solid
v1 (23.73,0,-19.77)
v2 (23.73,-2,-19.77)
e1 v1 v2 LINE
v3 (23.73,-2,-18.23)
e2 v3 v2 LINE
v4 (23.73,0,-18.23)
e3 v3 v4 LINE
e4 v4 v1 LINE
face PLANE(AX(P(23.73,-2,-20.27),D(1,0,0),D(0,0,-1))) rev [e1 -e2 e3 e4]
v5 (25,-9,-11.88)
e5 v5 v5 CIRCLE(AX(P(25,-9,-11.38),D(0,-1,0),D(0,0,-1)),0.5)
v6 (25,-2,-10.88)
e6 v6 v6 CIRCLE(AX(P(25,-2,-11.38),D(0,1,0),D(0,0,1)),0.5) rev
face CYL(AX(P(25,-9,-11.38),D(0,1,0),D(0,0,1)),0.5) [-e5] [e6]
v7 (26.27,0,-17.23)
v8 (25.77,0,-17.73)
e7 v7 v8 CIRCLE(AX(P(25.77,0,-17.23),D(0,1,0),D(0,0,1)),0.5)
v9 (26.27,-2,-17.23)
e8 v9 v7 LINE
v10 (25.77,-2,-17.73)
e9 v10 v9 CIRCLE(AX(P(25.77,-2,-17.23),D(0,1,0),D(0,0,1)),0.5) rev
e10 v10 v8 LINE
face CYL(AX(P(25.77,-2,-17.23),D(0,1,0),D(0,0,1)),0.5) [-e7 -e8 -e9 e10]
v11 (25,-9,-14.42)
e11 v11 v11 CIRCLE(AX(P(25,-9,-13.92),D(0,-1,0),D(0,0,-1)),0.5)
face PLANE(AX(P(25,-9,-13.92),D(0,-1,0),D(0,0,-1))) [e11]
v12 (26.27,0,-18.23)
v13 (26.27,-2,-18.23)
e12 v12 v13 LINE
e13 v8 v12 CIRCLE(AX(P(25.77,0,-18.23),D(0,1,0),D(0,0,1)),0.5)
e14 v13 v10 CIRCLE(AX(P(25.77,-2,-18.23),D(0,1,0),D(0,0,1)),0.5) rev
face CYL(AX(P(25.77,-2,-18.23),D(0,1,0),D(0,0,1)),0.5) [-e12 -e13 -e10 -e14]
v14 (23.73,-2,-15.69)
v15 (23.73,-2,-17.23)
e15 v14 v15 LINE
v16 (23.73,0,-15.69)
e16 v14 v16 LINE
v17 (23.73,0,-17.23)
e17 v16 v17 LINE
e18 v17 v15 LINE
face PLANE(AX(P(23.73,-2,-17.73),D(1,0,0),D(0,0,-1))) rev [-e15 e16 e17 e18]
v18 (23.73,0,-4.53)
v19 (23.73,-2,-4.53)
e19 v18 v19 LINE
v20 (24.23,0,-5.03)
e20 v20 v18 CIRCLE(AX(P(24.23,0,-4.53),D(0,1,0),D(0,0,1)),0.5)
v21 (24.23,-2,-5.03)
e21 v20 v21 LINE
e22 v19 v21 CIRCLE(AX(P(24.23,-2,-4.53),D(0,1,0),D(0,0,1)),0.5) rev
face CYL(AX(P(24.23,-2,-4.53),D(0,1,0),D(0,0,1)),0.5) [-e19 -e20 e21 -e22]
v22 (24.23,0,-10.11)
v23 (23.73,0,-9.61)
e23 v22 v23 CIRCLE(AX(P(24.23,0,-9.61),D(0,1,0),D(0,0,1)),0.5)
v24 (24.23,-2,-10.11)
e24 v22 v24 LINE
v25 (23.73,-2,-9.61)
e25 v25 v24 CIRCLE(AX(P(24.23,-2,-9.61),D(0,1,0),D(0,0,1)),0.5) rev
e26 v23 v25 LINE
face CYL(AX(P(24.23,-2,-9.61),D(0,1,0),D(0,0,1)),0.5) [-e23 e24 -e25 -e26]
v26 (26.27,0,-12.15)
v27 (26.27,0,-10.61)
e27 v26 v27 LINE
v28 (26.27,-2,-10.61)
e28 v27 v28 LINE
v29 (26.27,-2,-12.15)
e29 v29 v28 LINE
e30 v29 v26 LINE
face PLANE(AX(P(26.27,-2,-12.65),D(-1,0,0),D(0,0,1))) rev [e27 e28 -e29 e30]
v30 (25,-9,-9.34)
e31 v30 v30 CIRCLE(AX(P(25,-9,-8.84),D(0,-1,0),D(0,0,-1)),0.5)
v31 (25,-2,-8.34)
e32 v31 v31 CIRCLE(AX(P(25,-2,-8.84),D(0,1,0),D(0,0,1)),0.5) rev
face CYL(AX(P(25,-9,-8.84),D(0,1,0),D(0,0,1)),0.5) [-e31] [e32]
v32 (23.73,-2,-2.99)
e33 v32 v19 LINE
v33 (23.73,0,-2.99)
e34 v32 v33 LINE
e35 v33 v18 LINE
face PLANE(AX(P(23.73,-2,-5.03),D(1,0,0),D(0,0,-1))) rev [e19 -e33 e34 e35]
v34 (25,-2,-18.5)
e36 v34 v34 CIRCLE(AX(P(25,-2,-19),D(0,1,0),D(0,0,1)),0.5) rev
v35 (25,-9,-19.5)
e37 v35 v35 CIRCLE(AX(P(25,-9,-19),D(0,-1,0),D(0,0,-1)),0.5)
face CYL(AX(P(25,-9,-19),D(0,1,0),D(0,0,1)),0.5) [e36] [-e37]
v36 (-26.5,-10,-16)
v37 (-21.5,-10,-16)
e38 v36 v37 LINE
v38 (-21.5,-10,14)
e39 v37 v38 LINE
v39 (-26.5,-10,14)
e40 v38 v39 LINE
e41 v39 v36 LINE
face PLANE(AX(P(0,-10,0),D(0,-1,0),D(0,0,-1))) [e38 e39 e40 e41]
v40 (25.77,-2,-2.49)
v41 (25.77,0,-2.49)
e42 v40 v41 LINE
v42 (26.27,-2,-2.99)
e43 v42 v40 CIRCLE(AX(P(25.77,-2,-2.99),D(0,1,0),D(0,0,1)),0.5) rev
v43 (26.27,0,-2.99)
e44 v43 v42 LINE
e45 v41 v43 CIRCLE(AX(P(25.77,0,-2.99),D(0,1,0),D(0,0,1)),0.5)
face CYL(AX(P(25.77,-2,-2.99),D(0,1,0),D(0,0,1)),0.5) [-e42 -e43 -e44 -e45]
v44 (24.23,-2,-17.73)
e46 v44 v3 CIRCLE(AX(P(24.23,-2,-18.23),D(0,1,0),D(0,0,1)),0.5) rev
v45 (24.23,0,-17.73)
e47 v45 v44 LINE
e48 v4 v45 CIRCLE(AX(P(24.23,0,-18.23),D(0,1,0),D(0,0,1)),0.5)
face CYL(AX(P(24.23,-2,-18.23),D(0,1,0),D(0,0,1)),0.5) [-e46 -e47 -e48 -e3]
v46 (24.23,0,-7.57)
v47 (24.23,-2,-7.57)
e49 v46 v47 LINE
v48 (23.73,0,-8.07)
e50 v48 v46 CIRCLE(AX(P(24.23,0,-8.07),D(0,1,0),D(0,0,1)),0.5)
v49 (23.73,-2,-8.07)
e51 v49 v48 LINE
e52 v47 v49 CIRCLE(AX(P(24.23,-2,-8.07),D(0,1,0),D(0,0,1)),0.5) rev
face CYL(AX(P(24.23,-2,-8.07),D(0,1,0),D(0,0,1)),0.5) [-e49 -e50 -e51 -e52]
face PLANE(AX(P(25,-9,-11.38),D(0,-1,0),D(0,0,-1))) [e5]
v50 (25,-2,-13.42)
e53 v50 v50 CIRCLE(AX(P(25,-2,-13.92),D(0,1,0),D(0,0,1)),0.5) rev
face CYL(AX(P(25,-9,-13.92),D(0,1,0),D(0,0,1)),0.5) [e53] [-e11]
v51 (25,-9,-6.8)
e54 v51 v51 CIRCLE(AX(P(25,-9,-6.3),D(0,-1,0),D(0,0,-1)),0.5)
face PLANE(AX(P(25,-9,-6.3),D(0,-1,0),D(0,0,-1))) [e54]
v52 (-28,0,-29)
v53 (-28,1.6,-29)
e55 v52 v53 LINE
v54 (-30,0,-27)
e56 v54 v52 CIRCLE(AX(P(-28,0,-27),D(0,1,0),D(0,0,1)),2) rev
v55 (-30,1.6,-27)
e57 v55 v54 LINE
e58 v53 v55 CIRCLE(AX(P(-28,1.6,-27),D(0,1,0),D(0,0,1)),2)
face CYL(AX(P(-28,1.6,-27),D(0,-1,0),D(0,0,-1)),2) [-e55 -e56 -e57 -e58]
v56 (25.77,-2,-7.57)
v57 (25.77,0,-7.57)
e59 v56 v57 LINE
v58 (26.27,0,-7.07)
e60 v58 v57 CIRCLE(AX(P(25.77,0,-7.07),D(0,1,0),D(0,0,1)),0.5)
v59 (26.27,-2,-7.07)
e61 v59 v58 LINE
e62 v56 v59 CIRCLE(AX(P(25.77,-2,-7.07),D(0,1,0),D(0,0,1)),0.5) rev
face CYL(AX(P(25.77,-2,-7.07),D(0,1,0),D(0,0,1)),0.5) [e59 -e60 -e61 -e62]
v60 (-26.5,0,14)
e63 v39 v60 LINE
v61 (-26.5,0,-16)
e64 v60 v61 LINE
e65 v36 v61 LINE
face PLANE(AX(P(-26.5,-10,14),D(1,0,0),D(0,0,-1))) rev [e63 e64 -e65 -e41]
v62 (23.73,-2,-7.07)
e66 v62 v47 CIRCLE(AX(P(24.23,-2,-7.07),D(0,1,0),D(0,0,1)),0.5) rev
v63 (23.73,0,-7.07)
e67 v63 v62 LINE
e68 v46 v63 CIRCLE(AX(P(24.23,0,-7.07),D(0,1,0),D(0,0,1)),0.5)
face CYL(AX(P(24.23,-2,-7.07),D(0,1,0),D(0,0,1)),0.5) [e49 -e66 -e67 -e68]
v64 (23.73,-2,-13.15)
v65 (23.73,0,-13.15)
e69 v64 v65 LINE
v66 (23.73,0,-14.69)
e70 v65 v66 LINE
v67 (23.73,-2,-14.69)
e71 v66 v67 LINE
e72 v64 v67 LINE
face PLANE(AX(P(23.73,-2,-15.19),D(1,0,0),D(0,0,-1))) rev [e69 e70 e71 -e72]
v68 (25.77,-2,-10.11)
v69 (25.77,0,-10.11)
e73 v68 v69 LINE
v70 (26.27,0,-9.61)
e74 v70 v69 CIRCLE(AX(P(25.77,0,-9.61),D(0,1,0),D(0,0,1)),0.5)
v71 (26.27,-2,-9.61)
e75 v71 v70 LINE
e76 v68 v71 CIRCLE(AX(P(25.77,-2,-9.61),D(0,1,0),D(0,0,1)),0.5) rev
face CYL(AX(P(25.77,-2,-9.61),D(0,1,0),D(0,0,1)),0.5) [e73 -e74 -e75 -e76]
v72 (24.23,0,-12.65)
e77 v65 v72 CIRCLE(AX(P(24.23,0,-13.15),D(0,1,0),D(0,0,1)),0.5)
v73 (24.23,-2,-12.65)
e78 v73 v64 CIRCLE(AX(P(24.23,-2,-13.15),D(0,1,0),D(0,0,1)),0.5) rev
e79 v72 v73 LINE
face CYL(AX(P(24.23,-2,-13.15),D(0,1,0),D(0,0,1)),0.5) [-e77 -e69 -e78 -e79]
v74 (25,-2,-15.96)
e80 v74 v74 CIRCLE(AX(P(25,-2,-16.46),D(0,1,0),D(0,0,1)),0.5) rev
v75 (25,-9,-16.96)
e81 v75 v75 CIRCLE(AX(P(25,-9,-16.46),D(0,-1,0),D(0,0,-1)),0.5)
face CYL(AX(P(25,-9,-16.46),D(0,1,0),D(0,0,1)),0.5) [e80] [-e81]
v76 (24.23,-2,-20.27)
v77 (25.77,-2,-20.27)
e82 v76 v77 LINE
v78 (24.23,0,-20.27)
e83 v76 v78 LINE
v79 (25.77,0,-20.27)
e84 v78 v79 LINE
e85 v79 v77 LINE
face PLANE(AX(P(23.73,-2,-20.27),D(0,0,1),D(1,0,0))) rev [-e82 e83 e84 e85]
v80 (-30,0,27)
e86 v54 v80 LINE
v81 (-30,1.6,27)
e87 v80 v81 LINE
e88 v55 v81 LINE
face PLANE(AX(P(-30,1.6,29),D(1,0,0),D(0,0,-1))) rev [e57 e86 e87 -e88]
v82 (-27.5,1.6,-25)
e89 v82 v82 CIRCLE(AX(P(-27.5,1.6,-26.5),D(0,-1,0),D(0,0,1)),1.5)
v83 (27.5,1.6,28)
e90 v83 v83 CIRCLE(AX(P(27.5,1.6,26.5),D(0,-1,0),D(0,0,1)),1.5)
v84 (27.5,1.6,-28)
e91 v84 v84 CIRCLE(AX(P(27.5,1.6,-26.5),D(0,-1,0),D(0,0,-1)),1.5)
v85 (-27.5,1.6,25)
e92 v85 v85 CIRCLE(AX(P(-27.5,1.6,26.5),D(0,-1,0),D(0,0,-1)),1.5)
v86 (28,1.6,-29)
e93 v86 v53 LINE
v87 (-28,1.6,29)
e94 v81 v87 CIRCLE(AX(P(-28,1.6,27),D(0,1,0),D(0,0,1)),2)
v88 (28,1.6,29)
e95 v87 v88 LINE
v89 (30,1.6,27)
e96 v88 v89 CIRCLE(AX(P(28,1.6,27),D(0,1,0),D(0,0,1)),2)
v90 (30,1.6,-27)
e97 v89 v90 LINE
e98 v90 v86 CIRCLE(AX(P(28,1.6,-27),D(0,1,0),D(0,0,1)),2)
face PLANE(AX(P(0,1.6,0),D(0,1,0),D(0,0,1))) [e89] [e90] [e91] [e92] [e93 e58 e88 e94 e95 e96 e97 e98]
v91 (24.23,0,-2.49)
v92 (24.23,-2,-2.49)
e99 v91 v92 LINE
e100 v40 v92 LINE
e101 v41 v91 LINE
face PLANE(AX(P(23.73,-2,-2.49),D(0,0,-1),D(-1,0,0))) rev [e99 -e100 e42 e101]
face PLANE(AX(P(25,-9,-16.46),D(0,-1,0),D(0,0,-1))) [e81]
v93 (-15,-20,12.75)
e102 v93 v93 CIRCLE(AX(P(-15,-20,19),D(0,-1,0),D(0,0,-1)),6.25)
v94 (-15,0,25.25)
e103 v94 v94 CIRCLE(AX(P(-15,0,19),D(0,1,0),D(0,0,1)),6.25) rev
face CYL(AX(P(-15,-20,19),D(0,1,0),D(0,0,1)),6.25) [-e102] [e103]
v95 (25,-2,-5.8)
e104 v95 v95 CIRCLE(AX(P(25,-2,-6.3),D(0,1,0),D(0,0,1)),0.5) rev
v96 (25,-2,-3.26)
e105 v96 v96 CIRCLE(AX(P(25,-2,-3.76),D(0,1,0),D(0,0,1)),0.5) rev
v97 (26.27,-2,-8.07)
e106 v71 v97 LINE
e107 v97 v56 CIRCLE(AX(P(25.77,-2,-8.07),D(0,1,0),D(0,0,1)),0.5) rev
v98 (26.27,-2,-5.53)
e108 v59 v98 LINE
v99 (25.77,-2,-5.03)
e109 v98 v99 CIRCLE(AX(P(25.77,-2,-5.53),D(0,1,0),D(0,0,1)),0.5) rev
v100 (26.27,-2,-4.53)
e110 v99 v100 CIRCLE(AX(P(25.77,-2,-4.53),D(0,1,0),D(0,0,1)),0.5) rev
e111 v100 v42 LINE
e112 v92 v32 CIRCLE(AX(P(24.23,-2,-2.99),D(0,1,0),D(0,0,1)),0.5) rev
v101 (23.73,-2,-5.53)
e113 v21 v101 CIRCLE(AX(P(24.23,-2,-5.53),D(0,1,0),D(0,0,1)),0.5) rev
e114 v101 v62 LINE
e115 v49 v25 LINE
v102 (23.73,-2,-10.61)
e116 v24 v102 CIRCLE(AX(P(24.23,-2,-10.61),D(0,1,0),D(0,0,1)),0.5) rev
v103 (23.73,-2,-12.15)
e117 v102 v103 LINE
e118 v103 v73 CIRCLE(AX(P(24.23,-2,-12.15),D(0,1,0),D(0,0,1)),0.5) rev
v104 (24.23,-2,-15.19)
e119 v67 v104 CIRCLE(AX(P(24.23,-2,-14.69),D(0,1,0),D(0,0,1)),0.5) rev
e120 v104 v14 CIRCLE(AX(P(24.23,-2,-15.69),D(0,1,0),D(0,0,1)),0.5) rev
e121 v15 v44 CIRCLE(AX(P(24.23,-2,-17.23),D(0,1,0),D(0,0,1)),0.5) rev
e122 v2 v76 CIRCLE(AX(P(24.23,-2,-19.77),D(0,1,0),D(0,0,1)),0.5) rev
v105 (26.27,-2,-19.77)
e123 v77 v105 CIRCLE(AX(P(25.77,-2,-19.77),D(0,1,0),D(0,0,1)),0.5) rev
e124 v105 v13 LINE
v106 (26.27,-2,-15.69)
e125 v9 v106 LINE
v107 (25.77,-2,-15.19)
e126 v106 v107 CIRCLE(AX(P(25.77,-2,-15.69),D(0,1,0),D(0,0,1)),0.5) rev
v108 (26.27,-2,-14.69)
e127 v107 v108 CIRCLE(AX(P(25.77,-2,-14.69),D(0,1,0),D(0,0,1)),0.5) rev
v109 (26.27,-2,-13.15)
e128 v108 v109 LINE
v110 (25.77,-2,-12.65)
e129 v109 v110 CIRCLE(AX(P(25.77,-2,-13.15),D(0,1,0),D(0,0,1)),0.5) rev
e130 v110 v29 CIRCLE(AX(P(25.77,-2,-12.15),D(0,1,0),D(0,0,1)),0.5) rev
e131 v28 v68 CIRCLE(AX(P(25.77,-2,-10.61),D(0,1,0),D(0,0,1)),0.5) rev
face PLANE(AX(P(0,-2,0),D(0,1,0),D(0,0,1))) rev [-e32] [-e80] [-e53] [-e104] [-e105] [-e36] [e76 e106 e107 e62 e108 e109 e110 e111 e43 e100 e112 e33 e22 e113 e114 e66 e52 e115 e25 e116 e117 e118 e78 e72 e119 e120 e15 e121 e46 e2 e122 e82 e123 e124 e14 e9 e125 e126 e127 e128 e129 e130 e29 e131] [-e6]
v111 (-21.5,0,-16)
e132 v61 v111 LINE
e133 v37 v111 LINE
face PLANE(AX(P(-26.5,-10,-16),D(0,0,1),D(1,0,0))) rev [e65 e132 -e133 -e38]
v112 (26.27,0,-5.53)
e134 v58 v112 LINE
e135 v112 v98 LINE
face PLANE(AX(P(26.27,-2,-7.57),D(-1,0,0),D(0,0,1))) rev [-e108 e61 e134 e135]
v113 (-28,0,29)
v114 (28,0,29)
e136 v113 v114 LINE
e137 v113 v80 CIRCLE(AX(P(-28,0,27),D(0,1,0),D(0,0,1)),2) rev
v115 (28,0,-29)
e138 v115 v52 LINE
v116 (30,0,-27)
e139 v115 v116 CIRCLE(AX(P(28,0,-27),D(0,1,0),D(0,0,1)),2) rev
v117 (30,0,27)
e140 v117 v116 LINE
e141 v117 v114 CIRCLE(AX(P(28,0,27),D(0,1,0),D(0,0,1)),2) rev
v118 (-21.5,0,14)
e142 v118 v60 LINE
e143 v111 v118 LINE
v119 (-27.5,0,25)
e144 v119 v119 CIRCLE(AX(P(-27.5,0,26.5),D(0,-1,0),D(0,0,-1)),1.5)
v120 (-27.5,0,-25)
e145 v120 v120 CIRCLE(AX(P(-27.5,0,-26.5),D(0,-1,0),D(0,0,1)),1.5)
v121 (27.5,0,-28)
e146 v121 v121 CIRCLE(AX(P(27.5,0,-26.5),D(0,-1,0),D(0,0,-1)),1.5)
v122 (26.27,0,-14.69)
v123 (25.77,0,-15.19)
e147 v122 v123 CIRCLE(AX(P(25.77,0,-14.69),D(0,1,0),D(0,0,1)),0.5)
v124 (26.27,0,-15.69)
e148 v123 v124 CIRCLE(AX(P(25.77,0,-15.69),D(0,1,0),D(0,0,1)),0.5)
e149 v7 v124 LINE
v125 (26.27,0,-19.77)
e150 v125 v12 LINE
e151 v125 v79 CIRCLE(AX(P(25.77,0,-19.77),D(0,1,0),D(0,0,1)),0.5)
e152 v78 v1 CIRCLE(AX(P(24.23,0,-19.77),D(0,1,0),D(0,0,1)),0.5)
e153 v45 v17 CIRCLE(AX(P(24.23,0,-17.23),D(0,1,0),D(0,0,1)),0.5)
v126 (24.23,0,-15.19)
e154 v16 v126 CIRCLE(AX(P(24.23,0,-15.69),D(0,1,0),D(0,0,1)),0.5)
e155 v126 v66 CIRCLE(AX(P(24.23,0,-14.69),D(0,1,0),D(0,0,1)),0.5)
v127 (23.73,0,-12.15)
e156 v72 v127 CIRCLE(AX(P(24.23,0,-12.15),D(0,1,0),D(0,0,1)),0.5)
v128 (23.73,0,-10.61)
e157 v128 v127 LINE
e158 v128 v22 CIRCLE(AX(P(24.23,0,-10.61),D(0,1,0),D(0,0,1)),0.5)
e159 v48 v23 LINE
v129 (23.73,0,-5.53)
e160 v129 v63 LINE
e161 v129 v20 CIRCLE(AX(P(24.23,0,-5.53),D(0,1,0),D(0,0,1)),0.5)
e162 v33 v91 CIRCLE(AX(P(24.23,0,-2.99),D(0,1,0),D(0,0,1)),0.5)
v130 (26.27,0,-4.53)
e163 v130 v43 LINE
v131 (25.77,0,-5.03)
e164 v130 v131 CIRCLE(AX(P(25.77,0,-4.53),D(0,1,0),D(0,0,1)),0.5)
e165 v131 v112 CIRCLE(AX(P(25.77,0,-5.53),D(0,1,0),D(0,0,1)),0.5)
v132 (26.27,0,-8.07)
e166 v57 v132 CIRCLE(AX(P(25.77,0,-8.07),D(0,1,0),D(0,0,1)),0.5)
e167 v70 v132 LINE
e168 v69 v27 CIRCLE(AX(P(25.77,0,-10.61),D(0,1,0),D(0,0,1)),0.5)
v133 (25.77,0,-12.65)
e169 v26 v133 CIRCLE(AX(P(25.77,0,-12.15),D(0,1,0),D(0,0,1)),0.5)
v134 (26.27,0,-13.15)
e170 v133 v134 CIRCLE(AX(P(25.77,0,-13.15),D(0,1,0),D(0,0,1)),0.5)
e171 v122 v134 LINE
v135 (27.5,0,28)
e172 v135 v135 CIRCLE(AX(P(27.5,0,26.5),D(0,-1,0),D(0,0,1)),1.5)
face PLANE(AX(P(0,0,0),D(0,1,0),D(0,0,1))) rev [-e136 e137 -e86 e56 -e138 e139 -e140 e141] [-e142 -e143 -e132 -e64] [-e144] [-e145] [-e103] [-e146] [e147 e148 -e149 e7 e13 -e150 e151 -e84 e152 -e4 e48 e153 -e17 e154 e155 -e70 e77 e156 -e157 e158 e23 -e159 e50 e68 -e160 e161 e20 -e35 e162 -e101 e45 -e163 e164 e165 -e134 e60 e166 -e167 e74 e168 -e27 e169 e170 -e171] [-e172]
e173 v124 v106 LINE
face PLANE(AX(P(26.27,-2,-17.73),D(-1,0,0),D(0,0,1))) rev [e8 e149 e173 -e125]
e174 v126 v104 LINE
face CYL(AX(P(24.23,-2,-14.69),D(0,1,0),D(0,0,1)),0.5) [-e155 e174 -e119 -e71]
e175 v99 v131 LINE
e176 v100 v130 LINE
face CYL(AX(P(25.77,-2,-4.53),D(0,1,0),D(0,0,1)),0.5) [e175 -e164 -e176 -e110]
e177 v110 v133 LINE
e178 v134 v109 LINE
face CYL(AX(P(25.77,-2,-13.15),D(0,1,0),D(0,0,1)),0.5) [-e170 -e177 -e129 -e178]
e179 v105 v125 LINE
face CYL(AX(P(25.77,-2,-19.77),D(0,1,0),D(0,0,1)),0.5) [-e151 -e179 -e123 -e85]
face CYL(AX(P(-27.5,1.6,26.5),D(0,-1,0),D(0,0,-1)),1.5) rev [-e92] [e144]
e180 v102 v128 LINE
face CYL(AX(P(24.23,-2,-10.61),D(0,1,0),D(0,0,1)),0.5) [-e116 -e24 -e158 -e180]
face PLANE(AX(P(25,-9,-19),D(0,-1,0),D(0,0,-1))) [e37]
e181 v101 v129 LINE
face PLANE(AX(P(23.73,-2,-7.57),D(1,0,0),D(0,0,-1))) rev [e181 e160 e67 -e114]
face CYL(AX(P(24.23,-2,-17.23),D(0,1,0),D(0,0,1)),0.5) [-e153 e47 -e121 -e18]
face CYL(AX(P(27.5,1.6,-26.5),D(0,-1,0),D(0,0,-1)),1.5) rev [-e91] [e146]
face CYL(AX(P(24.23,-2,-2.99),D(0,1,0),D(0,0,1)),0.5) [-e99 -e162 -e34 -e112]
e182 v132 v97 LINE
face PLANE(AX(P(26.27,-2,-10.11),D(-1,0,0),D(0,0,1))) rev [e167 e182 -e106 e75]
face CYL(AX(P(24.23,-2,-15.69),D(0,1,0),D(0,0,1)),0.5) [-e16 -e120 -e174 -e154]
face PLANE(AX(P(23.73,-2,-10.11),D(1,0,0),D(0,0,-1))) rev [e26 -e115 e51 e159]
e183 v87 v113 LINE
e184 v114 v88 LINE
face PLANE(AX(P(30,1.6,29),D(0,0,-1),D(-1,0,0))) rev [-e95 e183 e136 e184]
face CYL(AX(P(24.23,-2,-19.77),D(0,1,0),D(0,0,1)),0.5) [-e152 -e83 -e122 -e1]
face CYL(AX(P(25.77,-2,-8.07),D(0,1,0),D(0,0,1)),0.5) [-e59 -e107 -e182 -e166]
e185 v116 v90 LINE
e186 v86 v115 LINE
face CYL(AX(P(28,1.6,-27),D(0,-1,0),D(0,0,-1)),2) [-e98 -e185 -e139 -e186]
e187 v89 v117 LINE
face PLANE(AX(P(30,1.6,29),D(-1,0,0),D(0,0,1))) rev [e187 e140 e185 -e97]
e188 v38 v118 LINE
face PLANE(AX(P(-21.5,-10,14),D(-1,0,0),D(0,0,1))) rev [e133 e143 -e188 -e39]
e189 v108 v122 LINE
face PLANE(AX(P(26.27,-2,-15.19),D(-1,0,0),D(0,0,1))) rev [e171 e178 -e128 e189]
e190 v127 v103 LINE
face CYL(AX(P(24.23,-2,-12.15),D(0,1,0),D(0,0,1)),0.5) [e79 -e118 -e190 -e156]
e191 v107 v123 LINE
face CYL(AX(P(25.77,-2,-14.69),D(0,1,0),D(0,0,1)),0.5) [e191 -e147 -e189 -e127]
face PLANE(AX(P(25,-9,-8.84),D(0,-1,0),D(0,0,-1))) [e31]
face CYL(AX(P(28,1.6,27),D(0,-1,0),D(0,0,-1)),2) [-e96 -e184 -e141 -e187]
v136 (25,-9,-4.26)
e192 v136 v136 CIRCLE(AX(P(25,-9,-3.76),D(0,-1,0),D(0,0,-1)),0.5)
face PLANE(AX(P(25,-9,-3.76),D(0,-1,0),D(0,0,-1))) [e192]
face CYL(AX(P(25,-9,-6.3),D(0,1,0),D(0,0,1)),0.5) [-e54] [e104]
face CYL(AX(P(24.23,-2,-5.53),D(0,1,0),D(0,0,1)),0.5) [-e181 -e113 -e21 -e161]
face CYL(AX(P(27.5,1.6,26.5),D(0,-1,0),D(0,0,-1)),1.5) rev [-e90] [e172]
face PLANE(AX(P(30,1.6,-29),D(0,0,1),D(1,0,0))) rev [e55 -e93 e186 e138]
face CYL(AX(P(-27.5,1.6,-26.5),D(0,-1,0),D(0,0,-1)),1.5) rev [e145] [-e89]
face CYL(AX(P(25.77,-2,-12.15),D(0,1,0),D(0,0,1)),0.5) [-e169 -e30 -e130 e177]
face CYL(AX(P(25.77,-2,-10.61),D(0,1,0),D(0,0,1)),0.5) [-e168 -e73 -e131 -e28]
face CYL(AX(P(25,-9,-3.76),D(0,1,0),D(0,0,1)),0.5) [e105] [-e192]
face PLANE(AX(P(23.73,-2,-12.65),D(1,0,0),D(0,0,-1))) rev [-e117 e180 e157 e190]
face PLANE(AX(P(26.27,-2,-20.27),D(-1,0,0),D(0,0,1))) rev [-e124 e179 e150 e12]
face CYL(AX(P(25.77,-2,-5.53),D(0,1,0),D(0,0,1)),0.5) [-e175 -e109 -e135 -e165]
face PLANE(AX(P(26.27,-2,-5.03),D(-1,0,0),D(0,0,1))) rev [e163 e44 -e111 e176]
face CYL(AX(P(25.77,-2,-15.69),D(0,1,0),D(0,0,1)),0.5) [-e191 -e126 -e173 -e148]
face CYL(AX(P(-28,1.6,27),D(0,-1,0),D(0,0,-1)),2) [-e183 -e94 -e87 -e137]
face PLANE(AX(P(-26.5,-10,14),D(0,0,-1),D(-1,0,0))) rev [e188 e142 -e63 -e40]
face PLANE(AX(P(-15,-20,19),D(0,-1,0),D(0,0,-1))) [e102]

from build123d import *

# Parameters (mm, degrees)
SKETCH1_W             = 60
SKETCH1_H             = 58
BOSS_EXTRUDE1_DEPTH   = 1.6
FILLET1_R             = 2
SKETCH2_R             = 1.5
CUT_EXTRUDE1_DEPTH    = 1.6
SKETCH3_R             = 6.25
BOSS_EXTRUDE2_DEPTH   = 20
SKETCH4_W             = 5
SKETCH4_H             = 30
BOSS_EXTRUDE3_DEPTH   = 10
SKETCH5_W             = 2.54
SKETCH5_H             = 2.54
BOSS_EXTRUDE4_DEPTH   = 2
FILLET2_R             = 0.5
SKETCH6_R             = 0.5
BOSS_EXTRUDE5_DEPTH   = 7
LPATTERN1_START       = -2
LPATTERN1_DEPTH       = 2
LPATTERN1_START_2     = -9
LPATTERN1_2_OUTLINE_R = 0.5
LPATTERN1_2_DEPTH     = 7


# Read off the part's stored shape, not the designer's step: LPattern1
with BuildPart() as part:
    # Sketch1 → Boss-Extrude1 (new body)
    with BuildSketch(Plane(origin=(0, 0, 0), x_dir=(1, 0, 0), z_dir=(0, 1, 0))):
        Rectangle(SKETCH1_W, SKETCH1_H)
    extrude(amount=BOSS_EXTRUDE1_DEPTH)

    # Fillet1
    fillet1_edges = [part.edges().sort_by_distance(p)[0] for p in [
        (-30, 0.8, -29),
        (30, 0.8, -29),
        (30, 0.8, 29),
        (-30, 0.8, 29),
    ]]
    fillet(fillet1_edges, radius=FILLET1_R)

    # Sketch2 → Cut-Extrude1 (cut)
    with BuildSketch(Plane.XZ):
        with Locations(Location((-27.5, 26.5, 0), (0, 0, 270))):
            Circle(SKETCH2_R)
        with Locations(Location((-27.5, -26.5, 0), (0, 0, 90))):
            Circle(SKETCH2_R)
        with Locations(Location((27.5, -26.5, 0), (0, 0, 270))):
            Circle(SKETCH2_R)
        with Locations(Location((27.5, 26.5, 0), (0, 0, 90))):
            Circle(SKETCH2_R)
    extrude(amount=-CUT_EXTRUDE1_DEPTH, mode=Mode.SUBTRACT)

    # Sketch3 → Boss-Extrude2 (add)
    with BuildSketch(Plane.XZ):
        with Locations(Location((-15, 19, 0), (0, 0, 90))):
            Circle(SKETCH3_R)
    extrude(amount=BOSS_EXTRUDE2_DEPTH)

    # Sketch4 → Boss-Extrude3 (add)
    with BuildSketch(Plane.XZ):
        with Locations((-24, -1)):
            Rectangle(SKETCH4_W, SKETCH4_H)
    extrude(amount=BOSS_EXTRUDE3_DEPTH)

    # Sketch5 → Boss-Extrude4 (add)
    with BuildSketch(Plane.XZ):
        with Locations((25, -19)):
            Rectangle(SKETCH5_W, SKETCH5_H)
    extrude(amount=BOSS_EXTRUDE4_DEPTH)

    # Fillet2
    fillet2_edges = [part.edges().sort_by_distance(p)[0] for p in [
        (26.27, -1, -20.27),
        (26.27, -1, -17.73),
        (23.73, -1, -17.73),
        (23.73, -1, -20.27),
    ]]
    fillet(fillet2_edges, radius=FILLET2_R)

    # Sketch6 → Boss-Extrude5 (add)
    with BuildSketch(Plane.XZ.offset(2)):
        with Locations(Location((25, -19, 0), (0, 0, 90))):
            Circle(SKETCH6_R)
    extrude(amount=BOSS_EXTRUDE5_DEPTH)

    # LPattern1 outline → LPattern1 (add)
    with BuildSketch(Plane(origin=(0, 0, 0), x_dir=(1, 0, 0), z_dir=(0, 1, 0)).offset(LPATTERN1_START)):
        with BuildLine():
            Line((26.27, 15.69), (26.27, 17.23))
            ThreePointArc((26.27, 17.23), (26.123553391, 17.583553391), (25.77, 17.73))
            Line((25.77, 17.73), (24.23, 17.73))
            ThreePointArc((24.23, 17.73), (23.876446609, 17.583553391), (23.73, 17.23))
            Line((23.73, 17.23), (23.73, 15.69))
            ThreePointArc((23.73, 15.69), (23.876446609, 15.336446609), (24.23, 15.19))
            ThreePointArc((24.23, 15.19), (23.876446609, 15.043553391), (23.73, 14.69))
            Line((23.73, 14.69), (23.73, 13.15))
            ThreePointArc((23.73, 13.15), (23.876446609, 12.796446609), (24.23, 12.65))
            ThreePointArc((24.23, 12.65), (23.876446609, 12.503553391), (23.73, 12.15))
            Line((23.73, 12.15), (23.73, 10.61))
            ThreePointArc((23.73, 10.61), (23.876446609, 10.256446609), (24.23, 10.11))
            ThreePointArc((24.23, 10.11), (23.876446609, 9.963553391), (23.73, 9.61))
            Line((23.73, 9.61), (23.73, 8.07))
            ThreePointArc((23.73, 8.07), (23.876446609, 7.716446609), (24.23, 7.57))
            ThreePointArc((24.23, 7.57), (23.876446609, 7.423553391), (23.73, 7.07))
            Line((23.73, 7.07), (23.73, 5.53))
            ThreePointArc((23.73, 5.53), (23.876446609, 5.176446609), (24.23, 5.03))
            ThreePointArc((24.23, 5.03), (23.876446609, 4.883553391), (23.73, 4.53))
            Line((23.73, 4.53), (23.73, 2.99))
            ThreePointArc((23.73, 2.99), (23.876446609, 2.636446609), (24.23, 2.49))
            Line((24.23, 2.49), (25.77, 2.49))
            ThreePointArc((25.77, 2.49), (26.123553391, 2.636446609), (26.27, 2.99))
            Line((26.27, 2.99), (26.27, 4.53))
            ThreePointArc((26.27, 4.53), (26.123553391, 4.883553391), (25.77, 5.03))
            ThreePointArc((25.77, 5.03), (26.123553391, 5.176446609), (26.27, 5.53))
            Line((26.27, 5.53), (26.27, 7.07))
            ThreePointArc((26.27, 7.07), (26.123553391, 7.423553391), (25.77, 7.57))
            ThreePointArc((25.77, 7.57), (26.123553391, 7.716446609), (26.27, 8.07))
            Line((26.27, 8.07), (26.27, 9.61))
            ThreePointArc((26.27, 9.61), (26.123553391, 9.963553391), (25.77, 10.11))
            ThreePointArc((25.77, 10.11), (26.123553391, 10.256446609), (26.27, 10.61))
            Line((26.27, 10.61), (26.27, 12.15))
            ThreePointArc((26.27, 12.15), (26.123553391, 12.503553391), (25.77, 12.65))
            ThreePointArc((25.77, 12.65), (26.123553391, 12.796446609), (26.27, 13.15))
            Line((26.27, 13.15), (26.27, 14.69))
            ThreePointArc((26.27, 14.69), (26.123553391, 15.043553391), (25.77, 15.19))
            ThreePointArc((25.77, 15.19), (26.123553391, 15.336446609), (26.27, 15.69))
        make_face()
    extrude(amount=LPATTERN1_DEPTH)

    # LPattern1 2 outline → LPattern1 2 (add)
    with BuildSketch(Plane(origin=(0, 0, 0), x_dir=(1, 0, 0), z_dir=(0, 1, 0)).offset(LPATTERN1_START_2)):
        with Locations((25, 16.46)):
            Circle(LPATTERN1_2_OUTLINE_R)
        with Locations((25, 13.92)):
            Circle(LPATTERN1_2_OUTLINE_R)
        with Locations((25, 11.38)):
            Circle(LPATTERN1_2_OUTLINE_R)
        with Locations((25, 8.84)):
            Circle(LPATTERN1_2_OUTLINE_R)
        with Locations((25, 6.3)):
            Circle(LPATTERN1_2_OUTLINE_R)
        with Locations((25, 3.76)):
            Circle(LPATTERN1_2_OUTLINE_R)
    extrude(amount=LPATTERN1_2_DEPTH)


solid = part.part
